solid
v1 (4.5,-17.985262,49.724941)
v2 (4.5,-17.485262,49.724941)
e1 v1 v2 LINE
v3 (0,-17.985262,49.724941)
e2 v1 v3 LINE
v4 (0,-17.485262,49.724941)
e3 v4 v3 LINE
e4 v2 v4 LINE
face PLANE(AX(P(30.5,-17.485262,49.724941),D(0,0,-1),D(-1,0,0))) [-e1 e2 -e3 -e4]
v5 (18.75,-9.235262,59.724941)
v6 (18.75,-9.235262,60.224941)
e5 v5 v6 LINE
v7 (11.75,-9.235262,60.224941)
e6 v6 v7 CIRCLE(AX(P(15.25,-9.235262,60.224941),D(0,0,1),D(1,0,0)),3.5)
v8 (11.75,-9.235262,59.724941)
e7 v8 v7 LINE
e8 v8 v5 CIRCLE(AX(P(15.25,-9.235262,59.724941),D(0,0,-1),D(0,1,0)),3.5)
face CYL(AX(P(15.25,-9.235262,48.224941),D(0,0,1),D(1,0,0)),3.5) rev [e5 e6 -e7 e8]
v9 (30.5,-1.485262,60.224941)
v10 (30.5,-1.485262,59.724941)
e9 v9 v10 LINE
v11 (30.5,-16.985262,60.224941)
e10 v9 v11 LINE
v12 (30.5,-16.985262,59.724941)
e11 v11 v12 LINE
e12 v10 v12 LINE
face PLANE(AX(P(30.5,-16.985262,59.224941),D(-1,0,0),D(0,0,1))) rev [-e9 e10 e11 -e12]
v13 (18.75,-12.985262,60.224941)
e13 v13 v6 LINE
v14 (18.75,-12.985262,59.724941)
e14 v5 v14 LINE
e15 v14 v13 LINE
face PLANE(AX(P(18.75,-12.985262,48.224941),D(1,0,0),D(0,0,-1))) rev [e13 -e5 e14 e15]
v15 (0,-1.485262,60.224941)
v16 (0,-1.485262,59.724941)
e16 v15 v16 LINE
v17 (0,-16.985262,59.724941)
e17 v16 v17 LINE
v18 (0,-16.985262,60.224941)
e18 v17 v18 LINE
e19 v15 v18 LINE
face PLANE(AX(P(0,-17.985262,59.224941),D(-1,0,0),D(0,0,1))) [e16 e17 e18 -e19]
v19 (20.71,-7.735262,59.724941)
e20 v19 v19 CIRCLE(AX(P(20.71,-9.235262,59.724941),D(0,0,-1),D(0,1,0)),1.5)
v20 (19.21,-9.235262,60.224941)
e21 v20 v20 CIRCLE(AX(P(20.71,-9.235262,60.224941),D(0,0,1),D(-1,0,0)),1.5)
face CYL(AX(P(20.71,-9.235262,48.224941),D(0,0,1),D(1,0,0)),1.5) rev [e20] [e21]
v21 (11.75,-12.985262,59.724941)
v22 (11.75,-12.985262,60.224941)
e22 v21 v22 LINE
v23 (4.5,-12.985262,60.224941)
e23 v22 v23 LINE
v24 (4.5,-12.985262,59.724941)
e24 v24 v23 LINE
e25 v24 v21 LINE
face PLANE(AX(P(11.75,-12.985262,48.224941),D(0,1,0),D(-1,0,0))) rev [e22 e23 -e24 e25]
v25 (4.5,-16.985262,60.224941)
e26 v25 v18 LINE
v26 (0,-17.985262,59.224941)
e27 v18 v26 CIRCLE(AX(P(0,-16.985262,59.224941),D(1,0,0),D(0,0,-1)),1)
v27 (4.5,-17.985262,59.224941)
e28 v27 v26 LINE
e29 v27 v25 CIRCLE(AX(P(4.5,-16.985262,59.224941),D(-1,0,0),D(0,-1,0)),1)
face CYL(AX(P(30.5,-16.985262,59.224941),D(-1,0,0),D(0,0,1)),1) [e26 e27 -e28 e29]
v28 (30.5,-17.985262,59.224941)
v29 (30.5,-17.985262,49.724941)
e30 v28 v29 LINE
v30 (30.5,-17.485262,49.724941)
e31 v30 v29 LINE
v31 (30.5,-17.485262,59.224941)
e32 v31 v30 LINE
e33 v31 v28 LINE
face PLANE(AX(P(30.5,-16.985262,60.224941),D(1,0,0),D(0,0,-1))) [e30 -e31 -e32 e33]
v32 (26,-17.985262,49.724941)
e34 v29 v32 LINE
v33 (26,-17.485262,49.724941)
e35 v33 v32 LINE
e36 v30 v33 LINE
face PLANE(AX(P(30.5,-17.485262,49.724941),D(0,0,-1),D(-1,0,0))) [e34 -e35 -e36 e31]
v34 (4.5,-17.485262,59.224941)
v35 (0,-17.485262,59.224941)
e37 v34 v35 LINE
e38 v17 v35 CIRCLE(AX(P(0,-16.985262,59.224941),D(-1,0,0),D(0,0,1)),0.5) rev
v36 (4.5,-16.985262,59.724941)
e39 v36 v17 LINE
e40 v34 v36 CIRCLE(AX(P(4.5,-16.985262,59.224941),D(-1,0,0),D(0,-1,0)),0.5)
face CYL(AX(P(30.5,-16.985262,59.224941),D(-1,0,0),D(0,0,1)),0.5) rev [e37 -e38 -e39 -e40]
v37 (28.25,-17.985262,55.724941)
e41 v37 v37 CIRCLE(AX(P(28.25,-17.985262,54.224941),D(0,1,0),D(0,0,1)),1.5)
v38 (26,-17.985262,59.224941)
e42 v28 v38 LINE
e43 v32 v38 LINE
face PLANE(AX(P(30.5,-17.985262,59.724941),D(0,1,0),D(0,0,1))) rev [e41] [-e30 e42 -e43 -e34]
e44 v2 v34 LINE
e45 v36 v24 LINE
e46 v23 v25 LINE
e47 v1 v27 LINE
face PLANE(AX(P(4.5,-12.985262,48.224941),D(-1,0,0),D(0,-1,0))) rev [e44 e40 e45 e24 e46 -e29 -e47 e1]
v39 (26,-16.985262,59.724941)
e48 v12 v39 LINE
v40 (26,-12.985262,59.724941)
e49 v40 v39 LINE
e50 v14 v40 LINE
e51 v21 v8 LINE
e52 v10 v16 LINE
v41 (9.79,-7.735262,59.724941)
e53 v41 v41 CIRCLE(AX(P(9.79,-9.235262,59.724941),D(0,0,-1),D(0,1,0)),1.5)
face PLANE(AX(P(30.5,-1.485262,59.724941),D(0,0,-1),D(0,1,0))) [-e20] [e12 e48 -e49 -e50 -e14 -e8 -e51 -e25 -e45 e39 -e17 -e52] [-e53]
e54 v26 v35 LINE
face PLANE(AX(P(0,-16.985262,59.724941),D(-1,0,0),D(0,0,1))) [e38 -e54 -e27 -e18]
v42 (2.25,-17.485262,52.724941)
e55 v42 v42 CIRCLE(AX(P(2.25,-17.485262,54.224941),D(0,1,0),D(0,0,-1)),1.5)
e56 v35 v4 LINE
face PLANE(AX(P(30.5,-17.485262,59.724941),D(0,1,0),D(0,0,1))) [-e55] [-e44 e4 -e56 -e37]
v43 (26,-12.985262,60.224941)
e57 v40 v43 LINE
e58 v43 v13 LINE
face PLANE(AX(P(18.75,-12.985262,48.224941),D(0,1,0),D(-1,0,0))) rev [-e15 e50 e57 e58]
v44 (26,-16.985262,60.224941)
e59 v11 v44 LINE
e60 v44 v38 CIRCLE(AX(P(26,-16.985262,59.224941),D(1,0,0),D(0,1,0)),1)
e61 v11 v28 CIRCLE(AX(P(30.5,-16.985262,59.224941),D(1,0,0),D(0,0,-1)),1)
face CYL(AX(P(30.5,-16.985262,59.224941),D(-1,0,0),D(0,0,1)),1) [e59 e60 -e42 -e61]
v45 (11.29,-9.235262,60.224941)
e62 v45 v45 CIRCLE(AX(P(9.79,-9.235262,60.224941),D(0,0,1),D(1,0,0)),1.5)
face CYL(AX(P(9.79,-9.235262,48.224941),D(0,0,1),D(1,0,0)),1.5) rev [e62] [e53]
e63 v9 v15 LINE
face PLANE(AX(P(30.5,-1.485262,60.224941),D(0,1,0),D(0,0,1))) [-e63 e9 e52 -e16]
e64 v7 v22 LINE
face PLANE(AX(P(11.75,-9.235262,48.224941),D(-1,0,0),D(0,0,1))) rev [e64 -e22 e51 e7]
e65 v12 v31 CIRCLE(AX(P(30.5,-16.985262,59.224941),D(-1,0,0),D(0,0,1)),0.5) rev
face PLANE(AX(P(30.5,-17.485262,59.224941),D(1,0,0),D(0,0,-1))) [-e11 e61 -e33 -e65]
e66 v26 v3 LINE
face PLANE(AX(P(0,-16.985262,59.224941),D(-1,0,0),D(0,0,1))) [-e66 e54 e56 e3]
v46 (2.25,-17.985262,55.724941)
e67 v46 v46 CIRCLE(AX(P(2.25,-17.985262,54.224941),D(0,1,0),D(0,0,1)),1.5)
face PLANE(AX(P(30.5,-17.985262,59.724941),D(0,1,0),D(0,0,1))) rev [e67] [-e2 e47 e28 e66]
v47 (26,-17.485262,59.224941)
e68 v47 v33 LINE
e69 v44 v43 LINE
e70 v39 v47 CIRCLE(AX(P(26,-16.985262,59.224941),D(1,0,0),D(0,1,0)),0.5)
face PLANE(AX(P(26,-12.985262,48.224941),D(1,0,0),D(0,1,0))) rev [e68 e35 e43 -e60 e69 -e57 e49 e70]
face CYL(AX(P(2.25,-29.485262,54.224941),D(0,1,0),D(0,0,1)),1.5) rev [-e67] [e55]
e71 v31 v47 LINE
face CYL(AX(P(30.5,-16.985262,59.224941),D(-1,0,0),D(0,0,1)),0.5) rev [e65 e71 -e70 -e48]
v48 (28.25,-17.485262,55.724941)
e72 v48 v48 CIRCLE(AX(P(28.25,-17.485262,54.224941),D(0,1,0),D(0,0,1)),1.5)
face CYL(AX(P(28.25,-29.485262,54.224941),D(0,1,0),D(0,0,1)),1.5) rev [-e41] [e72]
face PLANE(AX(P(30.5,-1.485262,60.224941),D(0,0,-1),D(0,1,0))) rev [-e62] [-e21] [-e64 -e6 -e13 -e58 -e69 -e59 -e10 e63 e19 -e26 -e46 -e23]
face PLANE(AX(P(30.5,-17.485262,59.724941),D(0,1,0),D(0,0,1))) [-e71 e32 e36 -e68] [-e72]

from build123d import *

# Parameters (mm, degrees)
BRIDA_BASE1_DEPTH     = 30.5
CROQUIS12_R           = 1.5
CORTAR_EXTRUIR1_DEPTH = 12
CROQUIS13_R           = 1.5
CORTAR_EXTRUIR2_DEPTH = 12


# Sheet-metal steps are written as plain solids
with BuildPart() as part:
    # Croquis1 → Brida base1 (new body)
    with BuildSketch(Plane(origin=(0, 0, 0), x_dir=(0, 0, -1), z_dir=(1, 0, 0))):
        with BuildLine():
            Line((-59.724940778, -1.485262267), (-59.724940778, -16.985262267))
            ThreePointArc((-59.724940778, -16.985262267), (-59.578494169, -17.338815658), (-59.224940778, -17.485262267))
            Line((-59.224940778, -17.485262267), (-49.724940778, -17.485262267))
            Line((-49.724940778, -17.485262267), (-49.724940778, -17.985262267))
            Line((-49.724940778, -17.985262267), (-59.224940778, -17.985262267))
            ThreePointArc((-59.224940778, -17.985262267), (-59.93204756, -17.692369049), (-60.224940778, -16.985262267))
            Line((-60.224940778, -16.985262267), (-60.224940778, -1.485262267))
            Line((-60.224940778, -1.485262267), (-59.724940778, -1.485262267))
        make_face()
    extrude(amount=BRIDA_BASE1_DEPTH)

    # Croquis12 → Cortar-Extruir1 (cut)
    with BuildSketch(Plane.XY.offset(60.224940778)):
        with Locations((9.79, -9.235262267)):
            Circle(CROQUIS12_R)
        with Locations(Location((20.71, -9.235262267, 0), (0, 0, 90))):
            Circle(CROQUIS12_R)
        with BuildLine():
            Line((11.75, -9.235262267), (11.75, -12.985262267))
            Line((11.75, -12.985262267), (4.5, -12.985262267))
            Line((4.5, -12.985262267), (4.5, -17.985262267))
            Line((4.5, -17.985262267), (11.75, -17.985262267))
            Line((11.75, -17.985262267), (18.75, -17.985262267))
            Line((18.75, -17.985262267), (26, -17.985262267))
            Line((26, -17.985262267), (26, -12.985262267))
            Line((26, -12.985262267), (18.75, -12.985262267))
            Line((18.75, -12.985262267), (18.75, -9.235262267))
            ThreePointArc((18.75, -9.235262267), (15.25, -5.735262267), (11.75, -9.235262267))
        make_face()
    extrude(amount=-CORTAR_EXTRUIR1_DEPTH, mode=Mode.SUBTRACT)

    # Croquis13 → Cortar-Extruir2 (cut)
    with BuildSketch(Plane(origin=(0, -17.485262267, 0), x_dir=(-1, 0, 0), z_dir=(0, 1, 0))):
        with Locations(Location((-28.25, 54.224940778, 0), (0, 0, 90))):
            Circle(CROQUIS13_R)
        with Locations(Location((-2.25, 54.224940778, 0), (0, 0, 90))):
            Circle(CROQUIS13_R)
    extrude(amount=-CORTAR_EXTRUIR2_DEPTH, mode=Mode.SUBTRACT)


solid = part.part
